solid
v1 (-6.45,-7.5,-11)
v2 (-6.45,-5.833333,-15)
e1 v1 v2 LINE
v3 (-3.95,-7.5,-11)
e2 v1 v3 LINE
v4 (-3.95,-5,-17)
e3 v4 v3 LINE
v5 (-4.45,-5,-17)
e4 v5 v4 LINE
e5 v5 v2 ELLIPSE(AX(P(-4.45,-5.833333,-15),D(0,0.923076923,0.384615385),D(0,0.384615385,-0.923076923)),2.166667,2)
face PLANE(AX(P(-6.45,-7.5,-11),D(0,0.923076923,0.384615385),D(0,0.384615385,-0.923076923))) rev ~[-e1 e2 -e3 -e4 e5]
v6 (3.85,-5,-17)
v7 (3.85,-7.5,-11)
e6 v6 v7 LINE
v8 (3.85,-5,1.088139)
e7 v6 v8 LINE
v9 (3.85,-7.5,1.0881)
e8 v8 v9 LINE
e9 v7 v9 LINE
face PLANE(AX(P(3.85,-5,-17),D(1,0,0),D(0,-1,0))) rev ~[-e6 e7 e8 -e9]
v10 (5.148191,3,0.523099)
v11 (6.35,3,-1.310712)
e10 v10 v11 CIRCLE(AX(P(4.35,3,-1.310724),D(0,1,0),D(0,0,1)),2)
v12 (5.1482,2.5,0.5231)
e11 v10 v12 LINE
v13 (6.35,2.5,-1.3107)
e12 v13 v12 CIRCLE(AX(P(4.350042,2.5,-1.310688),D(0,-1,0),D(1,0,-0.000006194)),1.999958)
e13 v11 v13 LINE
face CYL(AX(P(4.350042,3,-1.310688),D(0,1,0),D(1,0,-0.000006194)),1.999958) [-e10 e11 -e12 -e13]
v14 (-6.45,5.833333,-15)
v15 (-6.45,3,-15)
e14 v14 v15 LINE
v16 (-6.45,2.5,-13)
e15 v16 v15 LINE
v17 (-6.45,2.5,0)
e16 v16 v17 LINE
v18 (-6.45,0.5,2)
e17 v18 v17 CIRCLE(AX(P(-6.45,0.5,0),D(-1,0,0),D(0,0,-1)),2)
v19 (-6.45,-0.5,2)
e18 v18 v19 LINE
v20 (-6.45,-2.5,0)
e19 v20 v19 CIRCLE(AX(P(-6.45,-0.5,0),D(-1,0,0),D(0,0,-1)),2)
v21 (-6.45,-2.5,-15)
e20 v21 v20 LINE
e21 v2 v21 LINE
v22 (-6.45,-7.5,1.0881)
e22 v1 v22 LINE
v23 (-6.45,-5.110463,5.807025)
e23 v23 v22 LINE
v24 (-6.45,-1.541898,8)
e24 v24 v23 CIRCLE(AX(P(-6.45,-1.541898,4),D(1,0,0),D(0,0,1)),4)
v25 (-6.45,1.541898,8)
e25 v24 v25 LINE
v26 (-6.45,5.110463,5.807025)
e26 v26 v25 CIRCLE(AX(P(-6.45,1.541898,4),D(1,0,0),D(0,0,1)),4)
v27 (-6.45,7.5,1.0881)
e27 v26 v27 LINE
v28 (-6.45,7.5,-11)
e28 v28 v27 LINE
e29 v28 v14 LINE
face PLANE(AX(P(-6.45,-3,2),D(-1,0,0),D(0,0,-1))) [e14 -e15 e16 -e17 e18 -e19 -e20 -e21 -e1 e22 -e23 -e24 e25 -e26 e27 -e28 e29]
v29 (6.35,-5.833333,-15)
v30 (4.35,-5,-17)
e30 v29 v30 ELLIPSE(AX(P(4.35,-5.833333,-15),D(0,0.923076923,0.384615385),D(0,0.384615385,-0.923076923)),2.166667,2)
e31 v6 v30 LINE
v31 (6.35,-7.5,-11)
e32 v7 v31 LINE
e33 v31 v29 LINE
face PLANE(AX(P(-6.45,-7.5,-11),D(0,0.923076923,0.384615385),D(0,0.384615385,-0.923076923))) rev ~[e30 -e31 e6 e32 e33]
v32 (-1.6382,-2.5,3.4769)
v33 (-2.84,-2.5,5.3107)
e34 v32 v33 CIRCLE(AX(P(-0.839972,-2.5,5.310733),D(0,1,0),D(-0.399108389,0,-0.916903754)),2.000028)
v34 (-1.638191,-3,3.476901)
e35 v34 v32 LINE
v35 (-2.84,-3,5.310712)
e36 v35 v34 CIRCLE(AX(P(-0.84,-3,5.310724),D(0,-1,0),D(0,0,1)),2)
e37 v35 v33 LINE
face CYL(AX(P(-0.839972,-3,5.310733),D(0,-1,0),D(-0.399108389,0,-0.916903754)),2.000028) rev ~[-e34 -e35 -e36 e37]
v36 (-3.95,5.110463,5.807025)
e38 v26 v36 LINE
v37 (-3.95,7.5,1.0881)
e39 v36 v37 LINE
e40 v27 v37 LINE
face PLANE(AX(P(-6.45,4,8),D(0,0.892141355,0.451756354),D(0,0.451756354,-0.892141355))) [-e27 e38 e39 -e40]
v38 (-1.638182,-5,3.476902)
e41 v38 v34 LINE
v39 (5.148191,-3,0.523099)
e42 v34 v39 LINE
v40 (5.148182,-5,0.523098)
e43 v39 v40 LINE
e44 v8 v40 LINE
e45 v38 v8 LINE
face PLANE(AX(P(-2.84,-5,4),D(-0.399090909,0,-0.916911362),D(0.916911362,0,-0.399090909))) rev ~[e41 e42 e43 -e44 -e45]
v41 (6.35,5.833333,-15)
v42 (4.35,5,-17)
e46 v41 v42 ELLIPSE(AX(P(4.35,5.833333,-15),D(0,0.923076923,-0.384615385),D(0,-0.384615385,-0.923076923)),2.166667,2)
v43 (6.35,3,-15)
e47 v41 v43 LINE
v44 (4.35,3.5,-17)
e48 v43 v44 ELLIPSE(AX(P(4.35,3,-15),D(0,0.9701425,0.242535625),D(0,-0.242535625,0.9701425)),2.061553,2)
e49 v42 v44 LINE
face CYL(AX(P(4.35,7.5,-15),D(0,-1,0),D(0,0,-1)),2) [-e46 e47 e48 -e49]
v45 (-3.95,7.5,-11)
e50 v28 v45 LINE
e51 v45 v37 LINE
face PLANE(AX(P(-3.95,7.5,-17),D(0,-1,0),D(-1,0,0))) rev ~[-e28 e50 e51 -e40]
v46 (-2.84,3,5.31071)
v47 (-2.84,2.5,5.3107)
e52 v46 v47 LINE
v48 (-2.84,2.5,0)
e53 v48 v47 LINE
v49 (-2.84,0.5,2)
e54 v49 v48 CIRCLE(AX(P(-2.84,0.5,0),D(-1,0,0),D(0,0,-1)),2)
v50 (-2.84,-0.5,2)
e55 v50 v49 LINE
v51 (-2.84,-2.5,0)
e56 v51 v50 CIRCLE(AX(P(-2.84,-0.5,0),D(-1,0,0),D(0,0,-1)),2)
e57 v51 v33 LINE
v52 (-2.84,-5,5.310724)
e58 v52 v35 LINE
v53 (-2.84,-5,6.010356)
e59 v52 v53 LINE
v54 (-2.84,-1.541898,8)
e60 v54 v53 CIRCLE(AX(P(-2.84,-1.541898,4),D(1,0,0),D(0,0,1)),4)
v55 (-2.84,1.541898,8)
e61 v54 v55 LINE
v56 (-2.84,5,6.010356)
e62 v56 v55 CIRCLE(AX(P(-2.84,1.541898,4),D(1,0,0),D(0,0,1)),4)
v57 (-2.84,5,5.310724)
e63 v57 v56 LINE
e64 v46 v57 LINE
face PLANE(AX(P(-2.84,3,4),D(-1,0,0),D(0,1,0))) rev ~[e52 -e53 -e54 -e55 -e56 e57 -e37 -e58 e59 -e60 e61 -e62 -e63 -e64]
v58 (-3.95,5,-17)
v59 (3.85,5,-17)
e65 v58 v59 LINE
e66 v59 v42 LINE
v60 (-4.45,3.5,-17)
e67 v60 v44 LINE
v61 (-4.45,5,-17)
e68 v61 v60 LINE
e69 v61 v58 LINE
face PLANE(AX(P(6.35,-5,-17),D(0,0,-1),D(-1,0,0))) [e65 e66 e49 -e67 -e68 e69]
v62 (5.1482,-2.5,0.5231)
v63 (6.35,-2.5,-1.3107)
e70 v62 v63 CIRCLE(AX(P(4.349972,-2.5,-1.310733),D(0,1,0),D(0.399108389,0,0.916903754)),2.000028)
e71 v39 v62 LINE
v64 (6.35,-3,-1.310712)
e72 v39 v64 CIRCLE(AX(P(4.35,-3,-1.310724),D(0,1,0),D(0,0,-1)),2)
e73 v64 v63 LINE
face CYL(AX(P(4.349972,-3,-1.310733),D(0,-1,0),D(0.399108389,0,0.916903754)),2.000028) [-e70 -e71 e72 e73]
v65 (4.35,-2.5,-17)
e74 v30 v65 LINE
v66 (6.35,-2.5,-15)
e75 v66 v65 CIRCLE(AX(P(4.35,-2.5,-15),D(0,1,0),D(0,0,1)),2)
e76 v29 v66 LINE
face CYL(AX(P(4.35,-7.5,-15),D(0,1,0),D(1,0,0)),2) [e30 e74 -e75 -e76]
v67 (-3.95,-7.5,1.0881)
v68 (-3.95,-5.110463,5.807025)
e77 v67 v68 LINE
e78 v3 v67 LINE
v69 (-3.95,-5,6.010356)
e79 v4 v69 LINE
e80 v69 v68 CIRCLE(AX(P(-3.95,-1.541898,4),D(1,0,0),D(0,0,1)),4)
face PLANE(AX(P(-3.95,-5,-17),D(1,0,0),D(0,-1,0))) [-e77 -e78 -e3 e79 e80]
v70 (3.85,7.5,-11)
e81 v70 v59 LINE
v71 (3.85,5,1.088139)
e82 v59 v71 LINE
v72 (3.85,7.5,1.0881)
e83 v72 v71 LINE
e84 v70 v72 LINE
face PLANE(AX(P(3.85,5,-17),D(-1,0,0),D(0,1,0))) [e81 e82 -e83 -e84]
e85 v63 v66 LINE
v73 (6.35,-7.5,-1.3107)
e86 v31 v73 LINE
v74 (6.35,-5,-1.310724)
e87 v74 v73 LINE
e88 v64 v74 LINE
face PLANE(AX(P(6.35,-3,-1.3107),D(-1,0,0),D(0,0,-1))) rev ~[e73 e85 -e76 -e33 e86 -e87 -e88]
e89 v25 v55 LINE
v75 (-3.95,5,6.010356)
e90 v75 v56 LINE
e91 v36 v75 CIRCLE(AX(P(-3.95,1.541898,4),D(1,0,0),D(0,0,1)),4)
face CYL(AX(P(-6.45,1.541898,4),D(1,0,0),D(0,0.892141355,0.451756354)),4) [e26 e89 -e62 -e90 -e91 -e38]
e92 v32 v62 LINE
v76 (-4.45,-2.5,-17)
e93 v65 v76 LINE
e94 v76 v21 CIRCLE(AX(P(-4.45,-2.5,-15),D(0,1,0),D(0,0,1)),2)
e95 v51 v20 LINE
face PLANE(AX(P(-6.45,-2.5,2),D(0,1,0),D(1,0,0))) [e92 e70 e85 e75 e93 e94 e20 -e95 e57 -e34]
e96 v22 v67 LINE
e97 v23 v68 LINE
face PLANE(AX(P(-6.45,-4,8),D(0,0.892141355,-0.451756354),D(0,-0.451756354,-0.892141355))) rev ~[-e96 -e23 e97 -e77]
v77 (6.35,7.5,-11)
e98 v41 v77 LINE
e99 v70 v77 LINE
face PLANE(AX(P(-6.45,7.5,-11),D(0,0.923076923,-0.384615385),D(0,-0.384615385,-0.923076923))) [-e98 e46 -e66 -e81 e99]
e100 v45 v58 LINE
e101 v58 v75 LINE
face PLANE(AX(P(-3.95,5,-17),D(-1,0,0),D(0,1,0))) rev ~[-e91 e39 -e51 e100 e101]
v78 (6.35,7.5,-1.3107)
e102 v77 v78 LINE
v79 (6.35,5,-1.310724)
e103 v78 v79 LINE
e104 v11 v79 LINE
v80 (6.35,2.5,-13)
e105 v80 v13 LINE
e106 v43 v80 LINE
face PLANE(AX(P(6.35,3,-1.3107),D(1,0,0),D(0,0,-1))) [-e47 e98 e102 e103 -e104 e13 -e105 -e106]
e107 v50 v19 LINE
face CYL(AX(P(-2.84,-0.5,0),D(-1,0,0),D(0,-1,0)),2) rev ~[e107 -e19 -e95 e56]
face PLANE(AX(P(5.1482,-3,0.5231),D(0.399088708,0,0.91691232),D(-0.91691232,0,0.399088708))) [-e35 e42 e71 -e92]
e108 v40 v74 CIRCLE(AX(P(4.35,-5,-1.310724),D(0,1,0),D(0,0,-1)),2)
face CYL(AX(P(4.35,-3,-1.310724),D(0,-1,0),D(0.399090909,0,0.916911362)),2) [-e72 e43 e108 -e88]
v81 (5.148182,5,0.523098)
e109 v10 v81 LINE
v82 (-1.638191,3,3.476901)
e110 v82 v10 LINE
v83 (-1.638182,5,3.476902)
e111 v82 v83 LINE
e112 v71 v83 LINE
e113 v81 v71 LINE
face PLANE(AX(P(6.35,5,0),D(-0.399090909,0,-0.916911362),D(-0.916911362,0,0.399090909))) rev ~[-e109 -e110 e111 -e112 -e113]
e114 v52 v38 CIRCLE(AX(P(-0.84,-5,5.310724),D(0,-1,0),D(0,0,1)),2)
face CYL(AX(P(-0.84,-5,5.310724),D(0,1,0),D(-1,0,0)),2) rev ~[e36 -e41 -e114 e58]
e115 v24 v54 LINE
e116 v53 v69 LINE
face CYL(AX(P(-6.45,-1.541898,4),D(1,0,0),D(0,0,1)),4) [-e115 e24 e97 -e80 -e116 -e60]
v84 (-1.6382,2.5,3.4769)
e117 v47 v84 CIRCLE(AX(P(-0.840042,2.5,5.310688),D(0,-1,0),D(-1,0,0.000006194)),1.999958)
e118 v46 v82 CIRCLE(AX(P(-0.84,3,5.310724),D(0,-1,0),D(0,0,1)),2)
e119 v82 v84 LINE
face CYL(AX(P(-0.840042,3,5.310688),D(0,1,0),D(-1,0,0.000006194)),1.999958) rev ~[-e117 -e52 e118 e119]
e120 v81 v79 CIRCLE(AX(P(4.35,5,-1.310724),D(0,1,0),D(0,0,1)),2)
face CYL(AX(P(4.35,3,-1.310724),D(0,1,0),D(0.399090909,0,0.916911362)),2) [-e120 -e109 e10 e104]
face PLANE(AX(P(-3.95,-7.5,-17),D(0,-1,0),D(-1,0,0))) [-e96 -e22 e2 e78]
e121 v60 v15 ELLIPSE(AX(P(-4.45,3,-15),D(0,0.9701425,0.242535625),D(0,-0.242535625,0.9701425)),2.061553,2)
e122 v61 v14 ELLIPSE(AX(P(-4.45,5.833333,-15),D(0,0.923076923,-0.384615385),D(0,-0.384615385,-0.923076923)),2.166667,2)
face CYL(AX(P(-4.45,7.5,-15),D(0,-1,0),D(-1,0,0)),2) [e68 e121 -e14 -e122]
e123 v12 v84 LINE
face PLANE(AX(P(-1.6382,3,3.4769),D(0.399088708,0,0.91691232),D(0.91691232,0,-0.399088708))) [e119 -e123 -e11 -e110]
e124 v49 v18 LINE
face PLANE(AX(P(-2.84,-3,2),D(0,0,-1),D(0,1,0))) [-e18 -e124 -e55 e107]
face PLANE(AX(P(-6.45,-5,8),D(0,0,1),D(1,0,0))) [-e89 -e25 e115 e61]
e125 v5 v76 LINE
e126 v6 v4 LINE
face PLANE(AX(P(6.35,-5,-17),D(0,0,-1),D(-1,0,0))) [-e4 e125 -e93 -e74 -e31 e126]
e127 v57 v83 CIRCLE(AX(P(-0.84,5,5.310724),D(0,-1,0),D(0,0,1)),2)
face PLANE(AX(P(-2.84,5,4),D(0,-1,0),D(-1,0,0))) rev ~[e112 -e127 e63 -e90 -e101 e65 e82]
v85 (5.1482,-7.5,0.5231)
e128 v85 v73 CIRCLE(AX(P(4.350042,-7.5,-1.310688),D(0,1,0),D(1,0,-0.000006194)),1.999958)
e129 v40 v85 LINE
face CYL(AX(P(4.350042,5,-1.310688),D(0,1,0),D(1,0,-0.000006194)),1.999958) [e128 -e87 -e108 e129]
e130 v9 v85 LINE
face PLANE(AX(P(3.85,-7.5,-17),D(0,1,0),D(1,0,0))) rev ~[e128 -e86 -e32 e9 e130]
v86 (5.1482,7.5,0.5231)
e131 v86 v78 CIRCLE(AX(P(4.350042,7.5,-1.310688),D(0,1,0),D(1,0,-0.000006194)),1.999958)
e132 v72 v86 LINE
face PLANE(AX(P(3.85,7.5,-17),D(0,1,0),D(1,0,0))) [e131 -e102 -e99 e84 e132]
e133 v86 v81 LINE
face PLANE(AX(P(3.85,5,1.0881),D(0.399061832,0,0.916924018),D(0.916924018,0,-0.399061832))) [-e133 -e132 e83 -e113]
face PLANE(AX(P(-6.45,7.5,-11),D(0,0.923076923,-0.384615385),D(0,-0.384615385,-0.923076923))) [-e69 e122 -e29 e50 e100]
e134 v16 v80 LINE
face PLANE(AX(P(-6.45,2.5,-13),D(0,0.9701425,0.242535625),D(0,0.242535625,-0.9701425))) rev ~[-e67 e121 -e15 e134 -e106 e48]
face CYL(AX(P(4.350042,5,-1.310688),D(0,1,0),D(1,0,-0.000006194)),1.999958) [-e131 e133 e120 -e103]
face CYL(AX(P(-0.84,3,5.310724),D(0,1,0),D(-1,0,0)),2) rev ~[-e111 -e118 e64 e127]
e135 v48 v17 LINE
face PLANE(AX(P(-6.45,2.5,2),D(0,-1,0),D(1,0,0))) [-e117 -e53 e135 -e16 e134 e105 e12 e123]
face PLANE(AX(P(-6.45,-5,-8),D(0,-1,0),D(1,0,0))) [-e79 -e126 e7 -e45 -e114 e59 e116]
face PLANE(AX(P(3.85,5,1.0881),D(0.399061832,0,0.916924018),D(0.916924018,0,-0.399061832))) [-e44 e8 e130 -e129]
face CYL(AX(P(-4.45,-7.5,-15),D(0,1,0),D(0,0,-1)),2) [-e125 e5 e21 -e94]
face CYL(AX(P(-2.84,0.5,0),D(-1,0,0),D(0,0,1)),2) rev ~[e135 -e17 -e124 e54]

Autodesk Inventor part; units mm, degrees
ref_plane "YZ Plane" through (0, 0, 0) normal (1, 0, 0) x (0, 1, 0)
ref_plane "XZ Plane" through (0, 0, 0) normal (0, 1, 0) x (-1, 0, 0)
ref_plane "XY Plane" through (0, 0, 0) normal (0, 0, 1) x (1, 0, 0)
sketch "Sketch1" plane through (0, 0, 0) normal (0, 0, 1) x (1, 0, 0)
  line L0 (-4.78, -2.9) -> (4.78, -2.9)
  line L1 (6.35, 2.9) -> (-6.35, 2.9)
  line L2 (-4.78, -2.9) -> (-5.08, -2.9)
  line L3 (-6.35, -2.9) -> (-5.08, -2.9)
  line L4 (-6.35, 2.9) -> (-6.35, -2.9)
  line L5 (5.08, -2.9) -> (4.78, -2.9)
  line L6 (5.08, -2.9) -> (6.35, -2.9)
  line L7 (6.35, 3) -> (-6.45, 3)
  line L8 (-6.45, 3) -> (-6.45, -3)
  line L9 (-6.45, -3) -> (-5.08, -3)
  line L10 (-5.08, -3) -> (-4.78, -3)
  line L11 (-4.78, -3) -> (4.78, -3)
  line L12 (4.78, -3) -> (5.08, -3)
  line L13 (5.08, -3) -> (6.35, -3)
  line L14 (6.35, 5) -> (-8.45, 5)
  line L15 (-8.45, 5) -> (-8.45, -5)
  line L16 (-8.45, -5) -> (-5.08, -5)
  line L17 (-5.08, -5) -> (-4.78, -5)
  line L18 (-4.78, -5) -> (4.78, -5)
  line L19 (4.78, -5) -> (5.08, -5)
  line L20 (5.08, -5) -> (6.35, -5)
  line L21 (6.35, 3) -> (6.35, 5)
  line L22 (6.35, -3) -> (6.35, -5)
  point P0 (0, 0)
extrude "Extrusion1" add sketch "Sketch1" against normal blind 2
sketch "Sketch2" plane through (-8.45, -5, 0) normal (0, -1, 0) x (1, 0, 0)
  line L0 (2.1, -8) -> (2.1, -11.17) projected
  line L1 (0, 0) -> (14.8, 0) projected
  line L2 (2.1, -8) -> (3.37, -8) projected
  line L3 (14.8, 0) -> (14.8, -2) projected
  line L4 (2, 0) -> (14.8, 0) projected
  line L5 (2, 0) -> (14.8, 0)
  line L6 (14.8, 0) -> (14.8, -8)
  line L7 (14.8, -8) -> (2, -8)
  line L8 (2, -8) -> (2, 0)
  point P0 (8.45, 0)
extrude "Extrusion2" add sketch "Sketch2" against normal up to surface (2 mm away)
sketch "Sketch3" plane through (-8.45, 5, 0) normal (0, 1, 0) x (1, 0, 0)
  line L0 (0, 0) -> (14.8, 0) projected
  line L1 (0, 0) -> (0, 2) projected
  line L2 (2, 2) -> (0, 2) projected
  line L3 (2, 2) -> (2, 8) projected
  line L4 (2, 8) -> (14.8, 8) projected
  line L5 (14.8, 0) -> (14.8, 8) projected
  point P0 (8.45, 0)
extrude "Extrusion3" add sketch "Sketch3" against normal up to surface (2 mm away)
sketch "Sketch4" plane through (-8.45, -5, 0) normal (0, -1, 0) x (1, 0, 0)
  line L0 (2, -2) -> (2, -8) projected
  line L1 (0, 0) -> (14.8, 0) projected
  line L2 (3.67, -0.6428) -> (3.67, -14.175) projected
  line L3 (5.61, -0.6428) -> (5.61, -14.175) projected
  line L4 (2, -2) -> (5.61, -2)
  line L5 (5.61, -2) -> (5.61, 4)
  line L6 (5.61, 4) -> (2, 4)
  line L7 (2, 4) -> (2, -2)
  point P0 (8.45, 0)
  point P1 (2, 0)
  point P2 (5.61, 0)
  dimension "d8" = 6
extrude "Extrusion4" add sketch "Sketch4" against normal up to surface (10 mm away) contours L7 L6 L5 L1
sketch "Sketch5" plane through (-8.45, -5, -2) normal (0, -1, 0) x (1, 0, 0)
  line L0 (0, 2) -> (0, 0) projected
  line L1 (0, 2) -> (2, 2) projected
  line L2 (2, 0) -> (0, 0) projected
  line L3 (0, 2) -> (2, 2)
  line L4 (2, 2) -> (2, 0)
  line L5 (2, 0) -> (0, 0)
  line L6 (0, 0) -> (0, 2)
  point P0 (8.45, 2)
extrude "Extrusion5" cut sketch "Sketch5" against normal through all
sketch "Sketch6" plane through (-6.45, -5, -8) normal (0, -1, 0) x (1, 0, 0)
  line L0 (3.61, 8) -> (3.61, 12) projected
  line L1 (3.61, 8) -> (12.8, 8) projected
  line L2 (3.61, 12) -> (12.8, 8)
  point P0 (6.45, 8)
extrude "Extrusion6" add sketch "Sketch6" against normal up to surface (2 mm away)
sketch "Sketch7" plane through (-6.45, 5, -8) normal (0, 1, 0) x (1, 0, 0)
  line L0 (12.8, -8) -> (3.61, -12) projected
  line L1 (12.8, -8) -> (3.61, -8) projected
  line L2 (3.61, -8) -> (3.61, -12) projected
  point P0 (6.45, -8)
extrude "Extrusion7" add sketch "Sketch7" against normal up to surface (2 mm away)
sketch "Sketch8" plane through (-2.84, -3, 0) normal (1, 0, 0) x (0, 0, -1)
  line L0 (0, 6) -> (-4, 6) projected
  line L1 (-4, 0) -> (-4, 6) projected
  line L2 (-4, 0) -> (0, 0) projected
  line L3 (0, 0) -> (0, 6) projected
  line L4 (-4, 0) -> (0, 0) projected
  line L5 (-2, 0) -> (-2, 6)
  point P0 (0, 3)
  point P1 (-2, 0)
extrude "Extrusion8" cut sketch "Sketch8" against normal blind 10 contours L3 L2 L5 L0
sketch "Sketch9" plane through (-6.45, -5, 4) normal (0, 0, 1) x (1, 0, 0)
  line L0 (0, 8) -> (0, 2) projected
  line L1 (3.61, 10) -> (0, 10) projected
  line L2 (0, 0) -> (0, 10) projected
  line L3 (3.61, 0) -> (0, 0) projected
  line L4 (3.61, 0) -> (3.61, 2) projected
  line L5 (3.61, 2) -> (3.61, 8) projected
  line L6 (3.61, 8) -> (3.61, 10) projected
  point P0 (6.45, 5)
  point P1 (0, 2)
extrude "Extrusion9" add sketch "Sketch9" along normal blind 4
fillet "Fillet1" radius 2 4 edges at (-2.84, 4, 4) (-2.84, -4, 4) (6.35, 4, 0) (6.35, -4, 0)
sketch "Sketch10" plane through (6.35, -5, -8) normal (0, 0, -1) x (-1, 0, 0)
  line L0 (12.8, 2) -> (0, 2) projected
  line L1 (0, 0) -> (0, 2) projected
  line L2 (12.8, 0) -> (0, 0) projected
  line L3 (12.8, 0) -> (12.8, 2) projected
  line L4 (0, 8) -> (12.8, 8) projected
  line L5 (12.8, 10) -> (12.8, 8) projected
  line L6 (0, 10) -> (12.8, 10) projected
  line L7 (0, 10) -> (0, 8) projected
  point P0 (6.35, 5)
extrude "Extrusion10" add sketch "Sketch10" along normal blind 4
sketch "Sketch11" plane through (-6.45, 3, 2) normal (0, -1, 0) x (1, 0, 0)
  arc A0 (12.8, -3.3107) -> (11.5982, -1.4769) centre (10.8, -3.3107) ccw projected
  line L0 (4.8118, 1.4769) -> (11.5982, -1.4769) projected
  arc A1 (3.61, 3.3107) -> (4.8118, 1.4769) centre (5.61, 3.3107) ccw projected
  line L1 (3.61, 0) -> (3.61, 3.3107) projected
  line L2 (3.61, 0) -> (0, 0) projected
  line L3 (0, 0) -> (0, -14) projected
  line L4 (12.8, -14) -> (0, -14) projected
  line L5 (12.8, -3.3107) -> (12.8, -14) projected
  point P0 (6.45, -2)
extrude "Extrusion11" add sketch "Sketch11" along normal blind 0.5
sketch "Sketch12" plane through (-6.45, -3, 2) normal (0, 1, 0) x (1, 0, 0)
  arc A0 (11.5982, 1.4769) -> (12.8, 3.3107) centre (10.8, 3.3107) ccw projected
  line L0 (12.8, 3.3107) -> (12.8, 14) projected
  line L1 (0, 14) -> (12.8, 14) projected
  line L2 (0, 0) -> (0, 14) projected
  line L3 (3.61, 0) -> (0, 0) projected
  line L4 (3.61, -3.3107) -> (3.61, 0) projected
  arc A1 (4.8118, -1.4769) -> (3.61, -3.3107) centre (5.61, -3.3107) ccw projected
  line L5 (11.5982, 1.4769) -> (4.8118, -1.4769) projected
  point P0 (6.45, 2)
extrude "Extrusion12" add sketch "Sketch12" along normal blind 0.5
fillet "Fillet3" radius 2 2 edges at (-4.645, -2.5, 2) (-4.645, 2.5, 2)
sketch "Sketch14" plane through (6.35, -5, -12) normal (0, 0, -1) x (-1, 0, 0)
  line L0 (0, 0) -> (0, 2.5) projected
  line L1 (0, 0) -> (12.8, 0) projected
  line L2 (12.8, 0) -> (12.8, 2.5) projected
  line L3 (0, 2.5) -> (12.8, 2.5) projected
  line L4 (12.8, 10) -> (12.8, 7.5) projected
  line L5 (12.8, 10) -> (0, 10) projected
  line L6 (0, 10) -> (0, 7.5) projected
  line L7 (12.8, 7.5) -> (0, 7.5) projected
  point P0 (6.35, 5)
extrude "Extrusion13" add sketch "Sketch14" along normal blind 5
sketch "Sketch15" plane through (6.35, -5, -17) normal (0, 0, -1) x (-1, 0, 0)
  line L0 (12.8, 2.5) -> (0, 2.5) projected
  line L1 (0, 2.5) -> (0, 0) projected
  line L2 (0, 0) -> (12.8, 0) projected
  line L3 (12.8, 0) -> (12.8, 2.5) projected
  line L4 (0, 7.5) -> (12.8, 7.5) projected
  line L5 (12.8, 7.5) -> (12.8, 10) projected
  line L6 (12.8, 10) -> (0, 10) projected
  line L7 (0, 10) -> (0, 7.5) projected
  line L8 (12.8, 0) -> (10.3, 0)
  line L9 (10.3, 0) -> (10.3, -2.5)
  line L10 (10.3, -2.5) -> (12.8, -2.5)
  line L11 (12.8, -2.5) -> (12.8, 0)
  line L12 (12.8, 10) -> (10.3, 10)
  line L13 (10.3, 10) -> (10.3, 12.5)
  line L14 (10.3, 12.5) -> (12.8, 12.5)
  line L15 (12.8, 12.5) -> (12.8, 10)
  line L16 (0, 10) -> (2.5, 10)
  line L17 (2.5, 10) -> (2.5, 12.5)
  line L18 (2.5, 12.5) -> (0, 12.5)
  line L19 (0, 12.5) -> (0, 10)
  line L20 (0, 0) -> (2.5, 0)
  line L21 (2.5, 0) -> (2.5, -2.5)
  line L22 (2.5, -2.5) -> (0, -2.5)
  line L23 (0, -2.5) -> (0, 0)
  point P0 (6.35, 5)
  point P1 (2.5, 10)
  point P2 (2.5, 0)
  dimension "d39" = 2.5
  dimension "d40" = 2.5
  dimension "d41" = 2.5
  dimension "d42" = 2.5
  dimension "d43" = 2.5
  dimension "d44" = 2.5
  dimension "d45" = 2.5
  dimension "d46" = 2.5
extrude "Extrusion14" add sketch "Sketch15" against normal up to surface (25 mm away) contours L11 L10 L9 L2 | L2 L21 L22 L23 | L19 L18 L17 L6 | L6 L13 L14 L15
sketch "Sketch16" plane through (3.85, 5, 8) normal (0, -1, 0) x (1, 0, 0)
  line L0 (0, -6.9119) -> (1.2982, -7.4769) projected
  arc A0 (2.5, -9.3107) -> (1.2982, -7.4769) centre (0.5, -9.3107) ccw projected
  line L1 (2.5, -9.3107) -> (2.5, 0) projected
  line L2 (2.5, 0) -> (0, 0) projected
  line L3 (0, -6.9119) -> (0, 0) projected
  point P0 (-3.85, -8)
extrude "Extrusion15" cut sketch "Sketch16" along normal mid plane 31
fillet "Fillet5" radius 2 4 edges at (6.35, 5, -17) (-6.45, 5, -17) (6.35, -5, -17) (-6.45, -5, -17)
chamfer "Chamfer3" distance 2.5 angle 45 2 edges at (-5.2, -7.5, 8) (-5.2, 7.5, 8)
sketch "Sketch17" plane through (-6.45, 2.5, -15) normal (-1, 0, 0) x (0, 0, 1)
  line L0 (-2, 5) -> (-2, 0) projected
  line L1 (-2, 5) -> (0, 5) projected
  line L2 (0, 5) -> (20.5, 5) projected
  line L3 (0, 0) -> (-2, 0) projected
  line L4 (15, 0) -> (0, 0) projected
  line L5 (-2, 0) -> (-2, 1)
  line L6 (-2, 0) -> (-2, 5) projected
  line L7 (-2, 0) -> (2, 0)
  line L8 (2, 0) -> (-2, 1)
  point P0 (15, -2.5)
  point P1 (-2, 1)
  dimension "d55" = 1
  dimension "d56" = 4
extrude "Extrusion16" cut sketch "Sketch17" against normal blind 31
sketch "Sketch18" plane through (-6.45, -7.5, -15) normal (-1, 0, 0) x (0, 0, 1)
  line L0 (16.0881, 12.5) -> (-2, 12.5) projected
  line L1 (0, 15) -> (20.5, 15) projected
  line L2 (-2, 2.5) -> (16.0881, 2.5) projected
  line L3 (0, 0) -> (20.5, 0) projected
  line L4 (-2, 15) -> (0, 15) projected
  line L5 (-2, 15) -> (-2, 11) projected
  line L6 (-2, 5) -> (-2, 0) projected
  line L7 (0, 0) -> (-2, 0) projected
  line L8 (-2, 0) -> (4, 0)
  line L9 (4, 0) -> (-2, 2.5)
  line L10 (-2, 15) -> (4, 15)
  line L11 (4, 15) -> (-2, 12.5)
  point P0 (15, 7.5)
  dimension "d59" = 6
  dimension "d60" = 6
extrude "Extrusion17" cut sketch "Sketch18" against normal through all
sketch "Sketch19" plane through (-6.45, -2.5, -15) normal (-1, 0, 0) x (0, 0, 1)
  line L0 (23, -2.5) -> (23, 7.5) projected
  line L1 (20.5, 10) -> (23, 7.5) projected
  line L2 (23, -2.5) -> (20.5, -5) projected
  line L3 (4, 10) -> (20.5, 10) projected
  line L4 (4, -5) -> (20.5, -5) projected
  line L5 (16.0881, -5) -> (16.0881, -2.5) projected
  line L6 (16.0881, 7.5) -> (16.0881, 10) projected
  line L7 (23, -2.5) -> (23, -1.5)
  line L8 (23, -1.5) -> (16.0881, -5)
  line L9 (23, 7.5) -> (23, 6.5)
  line L10 (23, 6.5) -> (16.0881, 10)
  point P0 (15, 2.5)
  dimension "d63" = 1
  dimension "d64" = 1
extrude "Extrusion18" cut sketch "Sketch19" against normal up to surface (3.61 mm away)
fillet "Fillet6" radius 4 2 edges at (-4.645, -4, 8) (-4.645, 4, 8)
properties part number "MolexClipper_vertical_3DPrint"
